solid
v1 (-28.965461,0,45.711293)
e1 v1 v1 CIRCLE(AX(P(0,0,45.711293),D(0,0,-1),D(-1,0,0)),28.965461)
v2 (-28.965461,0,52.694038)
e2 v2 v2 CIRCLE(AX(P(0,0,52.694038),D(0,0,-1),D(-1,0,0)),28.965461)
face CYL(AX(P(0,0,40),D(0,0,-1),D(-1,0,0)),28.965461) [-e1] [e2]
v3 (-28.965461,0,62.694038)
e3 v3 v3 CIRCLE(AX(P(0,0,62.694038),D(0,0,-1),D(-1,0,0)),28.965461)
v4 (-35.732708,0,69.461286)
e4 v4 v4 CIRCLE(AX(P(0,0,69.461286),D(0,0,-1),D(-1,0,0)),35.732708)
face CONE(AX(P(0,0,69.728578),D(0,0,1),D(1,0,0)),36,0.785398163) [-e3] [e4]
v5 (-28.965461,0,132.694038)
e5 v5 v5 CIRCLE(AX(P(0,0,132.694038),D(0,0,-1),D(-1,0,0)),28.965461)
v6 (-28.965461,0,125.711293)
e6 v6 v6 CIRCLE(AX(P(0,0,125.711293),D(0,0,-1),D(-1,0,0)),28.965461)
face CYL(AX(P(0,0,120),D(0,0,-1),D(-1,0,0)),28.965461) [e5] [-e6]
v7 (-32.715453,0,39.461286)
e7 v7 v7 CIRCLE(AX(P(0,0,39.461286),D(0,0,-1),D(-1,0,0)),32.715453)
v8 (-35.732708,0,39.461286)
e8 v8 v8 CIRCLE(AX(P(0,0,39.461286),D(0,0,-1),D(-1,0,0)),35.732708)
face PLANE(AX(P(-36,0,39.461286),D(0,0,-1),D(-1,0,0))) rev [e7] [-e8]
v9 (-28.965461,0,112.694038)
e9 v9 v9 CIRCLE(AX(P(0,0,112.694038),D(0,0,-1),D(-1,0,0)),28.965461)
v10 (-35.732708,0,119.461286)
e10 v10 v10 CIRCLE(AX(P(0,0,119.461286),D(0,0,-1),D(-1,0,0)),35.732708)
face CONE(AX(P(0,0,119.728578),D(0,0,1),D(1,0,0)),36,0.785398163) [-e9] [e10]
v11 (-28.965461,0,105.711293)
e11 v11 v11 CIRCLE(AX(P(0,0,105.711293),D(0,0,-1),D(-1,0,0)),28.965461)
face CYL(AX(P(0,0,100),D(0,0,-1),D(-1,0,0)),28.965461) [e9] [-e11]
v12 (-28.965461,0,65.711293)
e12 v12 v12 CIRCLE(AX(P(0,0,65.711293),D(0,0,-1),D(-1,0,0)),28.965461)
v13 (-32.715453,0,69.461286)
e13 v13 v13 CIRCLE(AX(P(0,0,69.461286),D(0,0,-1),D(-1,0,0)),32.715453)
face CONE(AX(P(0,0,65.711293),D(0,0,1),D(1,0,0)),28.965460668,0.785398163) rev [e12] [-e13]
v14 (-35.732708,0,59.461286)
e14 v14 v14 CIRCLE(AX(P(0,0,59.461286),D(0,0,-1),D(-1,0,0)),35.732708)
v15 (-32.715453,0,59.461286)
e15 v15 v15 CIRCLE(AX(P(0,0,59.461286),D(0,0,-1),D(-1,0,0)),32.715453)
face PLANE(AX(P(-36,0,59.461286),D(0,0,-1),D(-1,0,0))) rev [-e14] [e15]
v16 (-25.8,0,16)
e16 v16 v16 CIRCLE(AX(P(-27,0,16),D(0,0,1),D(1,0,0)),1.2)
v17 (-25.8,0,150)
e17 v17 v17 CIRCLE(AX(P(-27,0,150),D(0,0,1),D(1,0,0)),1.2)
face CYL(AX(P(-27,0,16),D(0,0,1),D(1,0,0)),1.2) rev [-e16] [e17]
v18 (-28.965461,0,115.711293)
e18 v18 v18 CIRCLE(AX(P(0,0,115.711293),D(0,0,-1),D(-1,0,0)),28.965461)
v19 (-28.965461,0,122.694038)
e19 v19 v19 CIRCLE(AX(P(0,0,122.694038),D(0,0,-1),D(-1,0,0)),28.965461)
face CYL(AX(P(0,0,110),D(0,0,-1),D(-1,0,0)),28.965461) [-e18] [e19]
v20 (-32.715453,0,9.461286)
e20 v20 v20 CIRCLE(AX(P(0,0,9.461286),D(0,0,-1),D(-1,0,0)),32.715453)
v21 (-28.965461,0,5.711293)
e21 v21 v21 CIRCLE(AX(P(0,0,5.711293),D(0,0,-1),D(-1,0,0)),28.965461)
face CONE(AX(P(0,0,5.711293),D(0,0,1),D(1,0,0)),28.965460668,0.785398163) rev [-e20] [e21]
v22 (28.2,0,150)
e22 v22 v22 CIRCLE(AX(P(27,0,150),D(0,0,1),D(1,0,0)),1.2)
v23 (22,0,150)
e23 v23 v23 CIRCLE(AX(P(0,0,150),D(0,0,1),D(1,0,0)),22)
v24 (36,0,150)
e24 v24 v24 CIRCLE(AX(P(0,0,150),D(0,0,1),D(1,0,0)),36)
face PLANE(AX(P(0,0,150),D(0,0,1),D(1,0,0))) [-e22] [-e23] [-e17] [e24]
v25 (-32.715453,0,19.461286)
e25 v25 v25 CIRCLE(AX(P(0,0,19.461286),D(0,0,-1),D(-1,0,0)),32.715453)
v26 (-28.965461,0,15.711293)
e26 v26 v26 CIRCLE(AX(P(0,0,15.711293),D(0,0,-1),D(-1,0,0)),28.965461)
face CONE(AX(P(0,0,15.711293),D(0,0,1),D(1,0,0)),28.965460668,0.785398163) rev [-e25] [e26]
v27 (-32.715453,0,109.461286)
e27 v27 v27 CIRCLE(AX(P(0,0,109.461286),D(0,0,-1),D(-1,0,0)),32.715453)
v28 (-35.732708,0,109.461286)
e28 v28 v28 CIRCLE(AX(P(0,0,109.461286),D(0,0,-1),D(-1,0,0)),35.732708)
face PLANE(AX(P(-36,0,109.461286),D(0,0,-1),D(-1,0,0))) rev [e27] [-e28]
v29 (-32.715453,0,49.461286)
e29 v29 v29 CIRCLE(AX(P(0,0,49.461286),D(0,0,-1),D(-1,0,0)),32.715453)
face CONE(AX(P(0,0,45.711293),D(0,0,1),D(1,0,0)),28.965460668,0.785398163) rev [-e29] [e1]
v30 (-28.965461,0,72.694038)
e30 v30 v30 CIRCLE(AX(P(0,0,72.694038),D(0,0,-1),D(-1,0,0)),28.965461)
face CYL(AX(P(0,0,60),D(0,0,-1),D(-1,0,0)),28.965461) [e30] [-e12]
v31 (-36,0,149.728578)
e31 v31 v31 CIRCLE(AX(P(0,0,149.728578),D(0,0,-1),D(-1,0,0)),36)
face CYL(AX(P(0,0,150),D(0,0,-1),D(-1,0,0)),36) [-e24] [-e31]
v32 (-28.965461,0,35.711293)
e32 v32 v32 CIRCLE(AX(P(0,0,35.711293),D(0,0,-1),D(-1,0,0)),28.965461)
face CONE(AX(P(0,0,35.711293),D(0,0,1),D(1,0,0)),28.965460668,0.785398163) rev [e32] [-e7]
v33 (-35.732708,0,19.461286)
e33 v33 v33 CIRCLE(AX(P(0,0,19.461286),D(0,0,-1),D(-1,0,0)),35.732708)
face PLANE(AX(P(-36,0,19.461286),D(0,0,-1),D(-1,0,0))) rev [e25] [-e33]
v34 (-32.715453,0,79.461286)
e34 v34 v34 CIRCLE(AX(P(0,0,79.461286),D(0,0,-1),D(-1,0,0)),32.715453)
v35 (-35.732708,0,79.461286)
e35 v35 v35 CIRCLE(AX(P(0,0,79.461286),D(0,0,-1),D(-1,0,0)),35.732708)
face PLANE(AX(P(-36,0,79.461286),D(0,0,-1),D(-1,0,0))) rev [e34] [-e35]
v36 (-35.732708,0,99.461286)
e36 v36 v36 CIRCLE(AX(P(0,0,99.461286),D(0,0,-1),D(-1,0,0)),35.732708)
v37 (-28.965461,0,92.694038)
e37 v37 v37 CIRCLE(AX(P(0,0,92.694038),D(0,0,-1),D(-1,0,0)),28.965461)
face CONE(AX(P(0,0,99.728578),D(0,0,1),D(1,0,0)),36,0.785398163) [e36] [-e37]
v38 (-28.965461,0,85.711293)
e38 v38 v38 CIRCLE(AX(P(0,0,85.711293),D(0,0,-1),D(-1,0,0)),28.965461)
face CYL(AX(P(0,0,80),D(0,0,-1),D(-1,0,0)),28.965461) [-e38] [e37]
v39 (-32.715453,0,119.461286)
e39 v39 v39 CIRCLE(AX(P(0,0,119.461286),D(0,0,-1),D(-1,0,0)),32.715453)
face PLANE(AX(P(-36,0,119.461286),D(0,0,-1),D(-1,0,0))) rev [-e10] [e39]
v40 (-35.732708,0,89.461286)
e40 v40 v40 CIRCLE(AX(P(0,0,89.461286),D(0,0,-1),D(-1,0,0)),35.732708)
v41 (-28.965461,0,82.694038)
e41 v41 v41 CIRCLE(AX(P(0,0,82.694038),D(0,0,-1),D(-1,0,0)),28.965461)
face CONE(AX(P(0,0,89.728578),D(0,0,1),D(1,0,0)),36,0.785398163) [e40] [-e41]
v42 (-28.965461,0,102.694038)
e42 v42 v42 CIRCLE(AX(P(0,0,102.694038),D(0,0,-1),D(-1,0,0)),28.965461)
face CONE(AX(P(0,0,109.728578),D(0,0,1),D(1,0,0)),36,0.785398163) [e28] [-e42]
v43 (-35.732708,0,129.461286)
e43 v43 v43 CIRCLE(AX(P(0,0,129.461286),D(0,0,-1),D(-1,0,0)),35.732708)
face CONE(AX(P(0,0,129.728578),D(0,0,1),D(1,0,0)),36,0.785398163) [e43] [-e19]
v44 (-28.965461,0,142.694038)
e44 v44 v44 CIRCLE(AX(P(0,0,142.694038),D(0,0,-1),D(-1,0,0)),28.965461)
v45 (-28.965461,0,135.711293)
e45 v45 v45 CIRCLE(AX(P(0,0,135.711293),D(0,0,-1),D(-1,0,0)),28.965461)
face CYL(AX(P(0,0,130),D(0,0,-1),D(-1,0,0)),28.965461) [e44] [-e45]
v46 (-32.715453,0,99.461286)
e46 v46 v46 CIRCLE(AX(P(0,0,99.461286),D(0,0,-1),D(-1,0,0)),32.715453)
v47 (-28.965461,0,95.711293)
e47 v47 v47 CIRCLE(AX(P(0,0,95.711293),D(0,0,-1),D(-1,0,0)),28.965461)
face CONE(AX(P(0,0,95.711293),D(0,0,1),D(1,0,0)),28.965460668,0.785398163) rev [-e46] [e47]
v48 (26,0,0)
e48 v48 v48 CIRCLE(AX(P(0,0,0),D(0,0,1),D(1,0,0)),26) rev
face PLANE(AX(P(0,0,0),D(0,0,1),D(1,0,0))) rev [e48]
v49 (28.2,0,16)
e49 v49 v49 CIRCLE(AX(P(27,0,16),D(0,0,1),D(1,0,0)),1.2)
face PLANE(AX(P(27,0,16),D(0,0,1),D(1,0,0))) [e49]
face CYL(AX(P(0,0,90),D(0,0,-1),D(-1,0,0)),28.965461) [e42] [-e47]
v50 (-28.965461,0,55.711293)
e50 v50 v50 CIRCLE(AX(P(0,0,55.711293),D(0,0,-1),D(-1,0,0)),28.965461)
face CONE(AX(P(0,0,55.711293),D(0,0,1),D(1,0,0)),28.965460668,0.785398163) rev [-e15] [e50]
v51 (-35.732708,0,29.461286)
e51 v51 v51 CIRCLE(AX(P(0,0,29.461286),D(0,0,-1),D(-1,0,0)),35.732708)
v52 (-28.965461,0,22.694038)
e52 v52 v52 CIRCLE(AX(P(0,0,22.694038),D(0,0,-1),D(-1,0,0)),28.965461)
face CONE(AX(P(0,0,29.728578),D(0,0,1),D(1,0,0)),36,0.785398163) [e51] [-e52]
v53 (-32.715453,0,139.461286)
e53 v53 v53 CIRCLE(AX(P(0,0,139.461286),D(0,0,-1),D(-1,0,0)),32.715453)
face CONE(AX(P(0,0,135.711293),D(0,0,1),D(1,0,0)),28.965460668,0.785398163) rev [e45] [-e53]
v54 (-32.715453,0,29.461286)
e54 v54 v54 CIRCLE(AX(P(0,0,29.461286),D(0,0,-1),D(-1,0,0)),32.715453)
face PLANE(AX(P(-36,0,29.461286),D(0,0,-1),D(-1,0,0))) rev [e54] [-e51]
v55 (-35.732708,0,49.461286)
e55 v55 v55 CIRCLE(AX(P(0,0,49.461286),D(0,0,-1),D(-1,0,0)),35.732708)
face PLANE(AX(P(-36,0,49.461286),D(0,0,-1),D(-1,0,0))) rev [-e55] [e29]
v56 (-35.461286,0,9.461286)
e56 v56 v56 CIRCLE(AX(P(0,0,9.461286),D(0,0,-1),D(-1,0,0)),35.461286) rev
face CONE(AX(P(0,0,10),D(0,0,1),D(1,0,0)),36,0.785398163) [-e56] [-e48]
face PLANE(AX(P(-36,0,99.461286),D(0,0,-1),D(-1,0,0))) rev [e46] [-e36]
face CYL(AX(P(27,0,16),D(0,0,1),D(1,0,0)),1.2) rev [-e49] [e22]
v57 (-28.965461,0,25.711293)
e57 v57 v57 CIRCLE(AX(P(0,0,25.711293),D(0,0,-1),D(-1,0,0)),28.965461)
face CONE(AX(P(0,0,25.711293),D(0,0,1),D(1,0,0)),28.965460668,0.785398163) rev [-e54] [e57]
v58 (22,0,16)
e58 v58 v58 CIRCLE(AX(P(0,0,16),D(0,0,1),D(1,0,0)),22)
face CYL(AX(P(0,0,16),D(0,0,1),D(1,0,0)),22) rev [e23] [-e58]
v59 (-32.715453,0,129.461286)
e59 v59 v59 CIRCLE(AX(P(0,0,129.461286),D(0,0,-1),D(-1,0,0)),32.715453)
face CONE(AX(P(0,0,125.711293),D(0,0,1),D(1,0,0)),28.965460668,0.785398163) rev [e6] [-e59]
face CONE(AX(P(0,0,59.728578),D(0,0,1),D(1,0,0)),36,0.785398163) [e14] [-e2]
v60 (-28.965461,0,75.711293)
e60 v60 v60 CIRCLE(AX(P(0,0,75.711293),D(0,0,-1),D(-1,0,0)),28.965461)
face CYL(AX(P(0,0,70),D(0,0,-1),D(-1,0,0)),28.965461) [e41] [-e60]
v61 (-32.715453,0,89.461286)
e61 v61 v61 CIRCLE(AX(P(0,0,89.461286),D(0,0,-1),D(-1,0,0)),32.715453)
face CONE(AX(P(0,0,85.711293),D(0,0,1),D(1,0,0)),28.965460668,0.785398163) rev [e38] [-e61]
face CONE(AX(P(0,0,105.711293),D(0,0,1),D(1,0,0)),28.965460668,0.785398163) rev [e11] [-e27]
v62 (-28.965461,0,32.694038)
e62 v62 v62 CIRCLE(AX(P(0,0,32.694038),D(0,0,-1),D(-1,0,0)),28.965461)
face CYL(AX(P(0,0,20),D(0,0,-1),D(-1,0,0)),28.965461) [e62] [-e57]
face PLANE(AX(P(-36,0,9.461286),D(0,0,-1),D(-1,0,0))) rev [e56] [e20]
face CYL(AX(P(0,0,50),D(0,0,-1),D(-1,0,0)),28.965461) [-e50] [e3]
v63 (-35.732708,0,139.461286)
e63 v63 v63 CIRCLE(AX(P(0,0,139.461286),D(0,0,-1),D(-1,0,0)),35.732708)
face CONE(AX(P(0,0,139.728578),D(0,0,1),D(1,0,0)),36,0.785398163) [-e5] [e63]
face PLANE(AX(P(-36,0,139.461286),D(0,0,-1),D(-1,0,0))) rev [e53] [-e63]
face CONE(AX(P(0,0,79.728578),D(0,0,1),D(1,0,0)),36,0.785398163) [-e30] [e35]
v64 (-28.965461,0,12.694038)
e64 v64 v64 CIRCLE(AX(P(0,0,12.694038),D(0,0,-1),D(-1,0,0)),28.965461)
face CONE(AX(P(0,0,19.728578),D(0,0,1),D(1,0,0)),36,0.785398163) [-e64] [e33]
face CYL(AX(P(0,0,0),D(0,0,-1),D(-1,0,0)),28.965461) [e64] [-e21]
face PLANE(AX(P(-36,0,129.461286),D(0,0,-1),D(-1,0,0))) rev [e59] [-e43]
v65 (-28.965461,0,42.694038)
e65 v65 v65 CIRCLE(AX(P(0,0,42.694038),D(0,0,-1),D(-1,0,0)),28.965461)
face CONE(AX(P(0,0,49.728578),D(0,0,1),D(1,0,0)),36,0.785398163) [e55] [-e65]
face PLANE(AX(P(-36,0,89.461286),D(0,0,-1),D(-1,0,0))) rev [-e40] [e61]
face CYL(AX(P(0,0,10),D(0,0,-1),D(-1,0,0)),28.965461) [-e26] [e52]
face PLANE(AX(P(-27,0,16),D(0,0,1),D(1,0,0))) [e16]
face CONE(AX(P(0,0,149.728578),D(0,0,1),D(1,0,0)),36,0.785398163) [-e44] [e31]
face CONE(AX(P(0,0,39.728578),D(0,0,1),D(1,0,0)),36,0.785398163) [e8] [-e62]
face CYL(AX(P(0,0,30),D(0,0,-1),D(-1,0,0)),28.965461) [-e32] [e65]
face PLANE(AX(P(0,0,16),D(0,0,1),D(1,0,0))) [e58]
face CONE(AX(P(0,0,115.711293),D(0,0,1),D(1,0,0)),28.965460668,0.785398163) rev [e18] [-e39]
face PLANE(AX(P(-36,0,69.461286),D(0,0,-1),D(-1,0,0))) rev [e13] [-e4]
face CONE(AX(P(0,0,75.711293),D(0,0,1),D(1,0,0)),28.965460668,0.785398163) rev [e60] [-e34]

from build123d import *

# Parameters (mm, degrees)
ESBO_O1_R                = 36
RESSALTO_EXTRUS_O1_DEPTH = 150
PADR_O_LINEAR1_COUNT     = 14
PADR_O_LINEAR1_PITCH     = 10
CHANFRO1_SIZE            = 10
ESBO_O4_R                = 22
CORTE_EXTRUS_O1_DEPTH    = 134
ESBO_O5_R                = 1.2
CORTE_EXTRUS_O2_DEPTH    = 134


with BuildPart() as part:
    # Esboço1 → Ressalto-extrusão1 (new body)
    with BuildSketch(Plane.XY):
        Circle(ESBO_O1_R)
    extrude(amount=RESSALTO_EXTRUS_O1_DEPTH)

    # Esboço2 → Corte-Revolução1 (revolve, cut)
    with BuildSketch(Plane(origin=(0, 0, 0), x_dir=(1, 0, 0), z_dir=(0, 1, 0))):
        Polygon((-36, -9.461286074), (-32.715453344, -9.461286074), (-28.965460668, -5.711293398), (-28.965460668, -12.69403838), (-36, -19.728577712), align=None)
    corte_revolu_o1 = revolve(axis=Axis((0, 0, 0), (0, 0, 1)), mode=Mode.SUBTRACT)

    # Padrão linear1: Corte-Revolução1 ×14
    with Locations(*[(0, 0, i * PADR_O_LINEAR1_PITCH) for i in range(1, PADR_O_LINEAR1_COUNT)]):
        add(corte_revolu_o1, mode=Mode.SUBTRACT)

    # Chanfro1
    # the kernel refuses this chamfer: 10 mm, written as the material it takes off along each edge
    with BuildSketch(Plane(origin=(0, 0, 0), x_dir=(1, 0, 0), z_dir=(0, -1, 0))) as chanfro1_piece_1:
        Polygon((36, CHANFRO1_SIZE), (36 - CHANFRO1_SIZE, 0), (36, 0), align=None)
    revolve(axis=Axis((0, 0, 0), (0, 0, 1)), mode=Mode.SUBTRACT)

    # Esboço4 → Corte-extrusão1 (cut)
    with BuildSketch(Plane.XY.offset(150)):
        Circle(ESBO_O4_R)
    extrude(amount=-CORTE_EXTRUS_O1_DEPTH, mode=Mode.SUBTRACT)

    # Esboço5 → Corte-extrusão2 (cut)
    with BuildSketch(Plane.XY.offset(150)):
        with Locations((-27, 0)):
            Circle(ESBO_O5_R)
        with Locations((27, 0)):
            Circle(ESBO_O5_R)
    extrude(amount=-CORTE_EXTRUS_O2_DEPTH, mode=Mode.SUBTRACT)


solid = part.part
